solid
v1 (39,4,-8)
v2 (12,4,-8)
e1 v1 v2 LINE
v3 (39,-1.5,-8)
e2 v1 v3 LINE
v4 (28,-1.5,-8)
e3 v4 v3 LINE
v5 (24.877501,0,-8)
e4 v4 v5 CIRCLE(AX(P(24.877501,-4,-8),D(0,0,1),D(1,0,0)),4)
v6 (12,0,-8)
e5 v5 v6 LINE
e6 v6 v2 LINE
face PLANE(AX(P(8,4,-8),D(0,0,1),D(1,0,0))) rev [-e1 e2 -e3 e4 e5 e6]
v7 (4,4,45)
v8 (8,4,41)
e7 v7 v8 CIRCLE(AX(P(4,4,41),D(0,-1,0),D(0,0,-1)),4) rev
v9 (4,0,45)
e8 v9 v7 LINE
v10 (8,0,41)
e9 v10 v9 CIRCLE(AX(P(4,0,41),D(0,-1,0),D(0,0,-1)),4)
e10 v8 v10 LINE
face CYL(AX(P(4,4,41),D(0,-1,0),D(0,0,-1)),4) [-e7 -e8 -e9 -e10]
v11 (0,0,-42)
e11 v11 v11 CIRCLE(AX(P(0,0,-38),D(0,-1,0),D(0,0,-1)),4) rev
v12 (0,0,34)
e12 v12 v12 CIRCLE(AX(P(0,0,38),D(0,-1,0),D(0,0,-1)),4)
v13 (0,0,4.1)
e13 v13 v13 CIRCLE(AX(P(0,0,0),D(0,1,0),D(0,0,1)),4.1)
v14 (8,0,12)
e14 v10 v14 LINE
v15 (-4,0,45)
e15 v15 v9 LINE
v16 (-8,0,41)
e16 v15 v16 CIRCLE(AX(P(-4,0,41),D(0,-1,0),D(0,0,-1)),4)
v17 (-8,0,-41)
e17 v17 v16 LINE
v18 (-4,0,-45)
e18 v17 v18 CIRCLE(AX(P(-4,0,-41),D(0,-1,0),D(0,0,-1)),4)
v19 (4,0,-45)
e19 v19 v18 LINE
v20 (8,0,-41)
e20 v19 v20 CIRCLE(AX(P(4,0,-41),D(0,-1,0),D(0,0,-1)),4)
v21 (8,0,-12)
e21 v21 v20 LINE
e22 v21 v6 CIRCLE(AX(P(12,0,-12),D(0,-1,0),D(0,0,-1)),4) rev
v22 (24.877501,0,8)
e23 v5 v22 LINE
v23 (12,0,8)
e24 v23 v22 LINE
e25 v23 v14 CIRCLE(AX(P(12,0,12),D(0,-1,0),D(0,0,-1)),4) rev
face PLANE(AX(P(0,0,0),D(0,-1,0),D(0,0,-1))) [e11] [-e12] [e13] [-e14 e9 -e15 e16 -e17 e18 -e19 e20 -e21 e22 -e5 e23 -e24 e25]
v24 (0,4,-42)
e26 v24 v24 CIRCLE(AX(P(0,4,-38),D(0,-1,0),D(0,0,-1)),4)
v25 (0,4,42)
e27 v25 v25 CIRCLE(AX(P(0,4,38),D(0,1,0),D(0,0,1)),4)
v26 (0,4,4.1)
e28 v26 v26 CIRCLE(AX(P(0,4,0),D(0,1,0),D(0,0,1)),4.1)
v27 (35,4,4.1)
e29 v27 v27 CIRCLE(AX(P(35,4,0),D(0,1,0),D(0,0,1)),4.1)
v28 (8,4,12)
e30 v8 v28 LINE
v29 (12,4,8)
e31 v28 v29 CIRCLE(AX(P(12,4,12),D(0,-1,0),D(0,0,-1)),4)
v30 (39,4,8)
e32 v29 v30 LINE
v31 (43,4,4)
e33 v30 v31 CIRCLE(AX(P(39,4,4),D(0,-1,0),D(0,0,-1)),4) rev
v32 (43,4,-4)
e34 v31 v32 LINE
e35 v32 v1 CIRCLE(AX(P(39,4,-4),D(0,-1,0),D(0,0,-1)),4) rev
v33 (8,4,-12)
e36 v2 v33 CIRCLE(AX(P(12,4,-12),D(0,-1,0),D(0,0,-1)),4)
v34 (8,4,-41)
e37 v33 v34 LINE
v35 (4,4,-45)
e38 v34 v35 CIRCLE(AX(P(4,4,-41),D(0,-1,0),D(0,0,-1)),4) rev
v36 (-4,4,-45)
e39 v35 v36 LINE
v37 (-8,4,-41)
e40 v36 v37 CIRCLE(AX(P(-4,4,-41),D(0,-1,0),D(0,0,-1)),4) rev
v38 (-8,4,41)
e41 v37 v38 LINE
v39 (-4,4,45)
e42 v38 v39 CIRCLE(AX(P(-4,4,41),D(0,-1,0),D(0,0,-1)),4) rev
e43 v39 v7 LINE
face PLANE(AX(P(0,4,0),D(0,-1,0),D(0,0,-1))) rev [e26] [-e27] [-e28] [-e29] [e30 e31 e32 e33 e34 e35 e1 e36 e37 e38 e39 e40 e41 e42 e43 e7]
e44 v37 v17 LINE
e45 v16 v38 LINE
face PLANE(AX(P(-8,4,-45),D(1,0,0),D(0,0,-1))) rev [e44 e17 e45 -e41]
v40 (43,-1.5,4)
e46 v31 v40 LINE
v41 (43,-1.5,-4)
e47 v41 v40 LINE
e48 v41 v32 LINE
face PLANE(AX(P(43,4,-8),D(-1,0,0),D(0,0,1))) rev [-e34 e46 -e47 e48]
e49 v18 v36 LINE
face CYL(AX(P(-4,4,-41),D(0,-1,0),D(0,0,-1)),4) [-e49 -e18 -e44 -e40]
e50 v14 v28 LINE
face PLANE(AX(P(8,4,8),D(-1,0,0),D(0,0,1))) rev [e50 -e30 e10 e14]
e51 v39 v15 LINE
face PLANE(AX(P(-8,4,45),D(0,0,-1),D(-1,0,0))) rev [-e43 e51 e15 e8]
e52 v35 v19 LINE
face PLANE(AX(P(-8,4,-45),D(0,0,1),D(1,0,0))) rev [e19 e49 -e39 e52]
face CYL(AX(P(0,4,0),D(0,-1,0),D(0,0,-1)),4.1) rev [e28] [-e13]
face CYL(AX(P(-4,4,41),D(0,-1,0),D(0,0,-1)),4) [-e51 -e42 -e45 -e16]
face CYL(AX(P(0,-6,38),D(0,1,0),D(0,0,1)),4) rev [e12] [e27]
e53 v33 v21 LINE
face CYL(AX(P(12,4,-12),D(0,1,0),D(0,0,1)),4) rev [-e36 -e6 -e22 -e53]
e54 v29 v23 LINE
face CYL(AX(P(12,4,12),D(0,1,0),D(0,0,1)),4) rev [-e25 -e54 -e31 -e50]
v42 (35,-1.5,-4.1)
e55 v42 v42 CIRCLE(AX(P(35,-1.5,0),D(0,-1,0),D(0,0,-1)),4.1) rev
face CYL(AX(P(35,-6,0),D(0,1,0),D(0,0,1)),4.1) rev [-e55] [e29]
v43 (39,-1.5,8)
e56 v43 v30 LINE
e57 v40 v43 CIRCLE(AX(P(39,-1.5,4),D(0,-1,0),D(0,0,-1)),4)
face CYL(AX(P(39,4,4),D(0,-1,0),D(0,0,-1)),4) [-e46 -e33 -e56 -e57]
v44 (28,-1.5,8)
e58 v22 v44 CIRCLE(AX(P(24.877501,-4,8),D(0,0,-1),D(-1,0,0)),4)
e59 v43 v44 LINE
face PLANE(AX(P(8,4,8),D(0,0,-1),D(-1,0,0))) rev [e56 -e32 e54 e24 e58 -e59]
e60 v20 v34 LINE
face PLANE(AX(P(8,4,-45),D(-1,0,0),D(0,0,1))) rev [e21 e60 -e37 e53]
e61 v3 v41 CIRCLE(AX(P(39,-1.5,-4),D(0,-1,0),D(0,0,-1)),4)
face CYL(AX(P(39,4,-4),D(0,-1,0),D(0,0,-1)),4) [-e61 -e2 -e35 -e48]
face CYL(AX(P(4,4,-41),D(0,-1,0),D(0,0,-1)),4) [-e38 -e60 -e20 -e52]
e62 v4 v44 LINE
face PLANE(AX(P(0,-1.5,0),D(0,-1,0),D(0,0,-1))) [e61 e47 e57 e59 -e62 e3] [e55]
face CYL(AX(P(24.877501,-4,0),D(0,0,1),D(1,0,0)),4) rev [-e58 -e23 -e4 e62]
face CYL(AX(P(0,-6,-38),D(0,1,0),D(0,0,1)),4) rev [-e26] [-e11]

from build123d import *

# Parameters (mm, degrees)
SKETCH1_R           = 4.1
BOSS_EXTRUDE1_DEPTH = 4
SKETCH2_R           = 4
CUT_EXTRUDE1_DEPTH  = 10
FILLET1_R           = 4
SKETCH3_R           = 4.1
CUT_EXTRUDE2_DEPTH  = 10
SKETCH4_R           = 4.1
BOSS_EXTRUDE3_DEPTH = 1.5
FILLET3_R           = 4


with BuildPart() as part:
    # Sketch1 → Boss-Extrude1 (new body)
    with BuildSketch(Plane(origin=(0, 0, 0), x_dir=(1, 0, 0), z_dir=(0, 1, 0))):
        Polygon((-8, 45), (-8, -45), (8, -45), (8, -8), (43, -8), (43, 8), (8, 8), (8, 45), align=None)
        with Locations(Location((0, 0, 0), (0, 0, 270))):
            Circle(SKETCH1_R, mode=Mode.SUBTRACT)
    extrude(amount=BOSS_EXTRUDE1_DEPTH)

    # Sketch2 → Cut-Extrude1 (cut)
    with BuildSketch(Plane(origin=(0, 4, 0), x_dir=(1, 0, 0), z_dir=(0, 1, 0))):
        with Locations(Location((0, -38, 0), (0, 0, 270))):
            Circle(SKETCH2_R)
    cut_extrude1 = extrude(amount=-CUT_EXTRUDE1_DEPTH, mode=Mode.SUBTRACT)

    # Mirror1: Cut-Extrude1 across plane
    add(cut_extrude1.mirror(Plane.XY), mode=Mode.SUBTRACT)

    # Fillet1
    fillet1_edges = [part.edges().sort_by_distance(p)[0] for p in [
        (43, 2, -8),
        (43, 2, 8),
        (8, 2, 8),
        (8, 2, 45),
        (-8, 2, 45),
        (-8, 2, -45),
        (8, 2, -45),
        (8, 2, -8),
    ]]
    fillet(fillet1_edges, radius=FILLET1_R)

    # Sketch3 → Cut-Extrude2 (cut)
    with BuildSketch(Plane(origin=(0, 4, 0), x_dir=(1, 0, 0), z_dir=(0, 1, 0))):
        with Locations(Location((35, 0, 0), (0, 0, 270))):
            Circle(SKETCH3_R)
    extrude(amount=-CUT_EXTRUDE2_DEPTH, mode=Mode.SUBTRACT)

    # Sketch4 → Boss-Extrude3 (add)
    with BuildSketch(Plane(origin=(0, 0, 0), x_dir=(1, 0, 0), z_dir=(0, 1, 0))):
        with BuildLine():
            Line((39, 8), (28, 8))
            Line((28, 8), (28, -8))
            Line((28, -8), (39, -8))
            ThreePointArc((39, -8), (41.828427125, -6.828427125), (43, -4))
            Line((43, -4), (43, 4))
            ThreePointArc((43, 4), (41.828427125, 6.828427125), (39, 8))
        make_face()
        with Locations(Location((35, 0, 0), (0, 0, 270))):
            Circle(SKETCH4_R, mode=Mode.SUBTRACT)
    extrude(amount=-BOSS_EXTRUDE3_DEPTH)

    # Fillet3
    # the kernel refuses this fillet: 4 mm, written as the material it adds along each edge
    with BuildSketch(Plane(origin=(28, 0, -8), x_dir=(0, -1, 0), z_dir=(0, 0, 1))) as fillet3_piece_1:
        with BuildLine():
            CenterArc((4, -3.122498999), FILLET3_R, 128.682187453, 51.317812547)
            Line((0, -3.122498999), (-0.08, -3.122498999))
            Line((-0.08, -3.122498999), (-0.08, 0))
            Line((-0.08, 0), (0, 0.08))
            ThreePointArc((0, 0.08), (0.75, 0.08), (1.45, 0.06244998))
            Line((1.45, 0.06244998), (1.5, 0))
        make_face()
    extrude(amount=16)


solid = part.part
